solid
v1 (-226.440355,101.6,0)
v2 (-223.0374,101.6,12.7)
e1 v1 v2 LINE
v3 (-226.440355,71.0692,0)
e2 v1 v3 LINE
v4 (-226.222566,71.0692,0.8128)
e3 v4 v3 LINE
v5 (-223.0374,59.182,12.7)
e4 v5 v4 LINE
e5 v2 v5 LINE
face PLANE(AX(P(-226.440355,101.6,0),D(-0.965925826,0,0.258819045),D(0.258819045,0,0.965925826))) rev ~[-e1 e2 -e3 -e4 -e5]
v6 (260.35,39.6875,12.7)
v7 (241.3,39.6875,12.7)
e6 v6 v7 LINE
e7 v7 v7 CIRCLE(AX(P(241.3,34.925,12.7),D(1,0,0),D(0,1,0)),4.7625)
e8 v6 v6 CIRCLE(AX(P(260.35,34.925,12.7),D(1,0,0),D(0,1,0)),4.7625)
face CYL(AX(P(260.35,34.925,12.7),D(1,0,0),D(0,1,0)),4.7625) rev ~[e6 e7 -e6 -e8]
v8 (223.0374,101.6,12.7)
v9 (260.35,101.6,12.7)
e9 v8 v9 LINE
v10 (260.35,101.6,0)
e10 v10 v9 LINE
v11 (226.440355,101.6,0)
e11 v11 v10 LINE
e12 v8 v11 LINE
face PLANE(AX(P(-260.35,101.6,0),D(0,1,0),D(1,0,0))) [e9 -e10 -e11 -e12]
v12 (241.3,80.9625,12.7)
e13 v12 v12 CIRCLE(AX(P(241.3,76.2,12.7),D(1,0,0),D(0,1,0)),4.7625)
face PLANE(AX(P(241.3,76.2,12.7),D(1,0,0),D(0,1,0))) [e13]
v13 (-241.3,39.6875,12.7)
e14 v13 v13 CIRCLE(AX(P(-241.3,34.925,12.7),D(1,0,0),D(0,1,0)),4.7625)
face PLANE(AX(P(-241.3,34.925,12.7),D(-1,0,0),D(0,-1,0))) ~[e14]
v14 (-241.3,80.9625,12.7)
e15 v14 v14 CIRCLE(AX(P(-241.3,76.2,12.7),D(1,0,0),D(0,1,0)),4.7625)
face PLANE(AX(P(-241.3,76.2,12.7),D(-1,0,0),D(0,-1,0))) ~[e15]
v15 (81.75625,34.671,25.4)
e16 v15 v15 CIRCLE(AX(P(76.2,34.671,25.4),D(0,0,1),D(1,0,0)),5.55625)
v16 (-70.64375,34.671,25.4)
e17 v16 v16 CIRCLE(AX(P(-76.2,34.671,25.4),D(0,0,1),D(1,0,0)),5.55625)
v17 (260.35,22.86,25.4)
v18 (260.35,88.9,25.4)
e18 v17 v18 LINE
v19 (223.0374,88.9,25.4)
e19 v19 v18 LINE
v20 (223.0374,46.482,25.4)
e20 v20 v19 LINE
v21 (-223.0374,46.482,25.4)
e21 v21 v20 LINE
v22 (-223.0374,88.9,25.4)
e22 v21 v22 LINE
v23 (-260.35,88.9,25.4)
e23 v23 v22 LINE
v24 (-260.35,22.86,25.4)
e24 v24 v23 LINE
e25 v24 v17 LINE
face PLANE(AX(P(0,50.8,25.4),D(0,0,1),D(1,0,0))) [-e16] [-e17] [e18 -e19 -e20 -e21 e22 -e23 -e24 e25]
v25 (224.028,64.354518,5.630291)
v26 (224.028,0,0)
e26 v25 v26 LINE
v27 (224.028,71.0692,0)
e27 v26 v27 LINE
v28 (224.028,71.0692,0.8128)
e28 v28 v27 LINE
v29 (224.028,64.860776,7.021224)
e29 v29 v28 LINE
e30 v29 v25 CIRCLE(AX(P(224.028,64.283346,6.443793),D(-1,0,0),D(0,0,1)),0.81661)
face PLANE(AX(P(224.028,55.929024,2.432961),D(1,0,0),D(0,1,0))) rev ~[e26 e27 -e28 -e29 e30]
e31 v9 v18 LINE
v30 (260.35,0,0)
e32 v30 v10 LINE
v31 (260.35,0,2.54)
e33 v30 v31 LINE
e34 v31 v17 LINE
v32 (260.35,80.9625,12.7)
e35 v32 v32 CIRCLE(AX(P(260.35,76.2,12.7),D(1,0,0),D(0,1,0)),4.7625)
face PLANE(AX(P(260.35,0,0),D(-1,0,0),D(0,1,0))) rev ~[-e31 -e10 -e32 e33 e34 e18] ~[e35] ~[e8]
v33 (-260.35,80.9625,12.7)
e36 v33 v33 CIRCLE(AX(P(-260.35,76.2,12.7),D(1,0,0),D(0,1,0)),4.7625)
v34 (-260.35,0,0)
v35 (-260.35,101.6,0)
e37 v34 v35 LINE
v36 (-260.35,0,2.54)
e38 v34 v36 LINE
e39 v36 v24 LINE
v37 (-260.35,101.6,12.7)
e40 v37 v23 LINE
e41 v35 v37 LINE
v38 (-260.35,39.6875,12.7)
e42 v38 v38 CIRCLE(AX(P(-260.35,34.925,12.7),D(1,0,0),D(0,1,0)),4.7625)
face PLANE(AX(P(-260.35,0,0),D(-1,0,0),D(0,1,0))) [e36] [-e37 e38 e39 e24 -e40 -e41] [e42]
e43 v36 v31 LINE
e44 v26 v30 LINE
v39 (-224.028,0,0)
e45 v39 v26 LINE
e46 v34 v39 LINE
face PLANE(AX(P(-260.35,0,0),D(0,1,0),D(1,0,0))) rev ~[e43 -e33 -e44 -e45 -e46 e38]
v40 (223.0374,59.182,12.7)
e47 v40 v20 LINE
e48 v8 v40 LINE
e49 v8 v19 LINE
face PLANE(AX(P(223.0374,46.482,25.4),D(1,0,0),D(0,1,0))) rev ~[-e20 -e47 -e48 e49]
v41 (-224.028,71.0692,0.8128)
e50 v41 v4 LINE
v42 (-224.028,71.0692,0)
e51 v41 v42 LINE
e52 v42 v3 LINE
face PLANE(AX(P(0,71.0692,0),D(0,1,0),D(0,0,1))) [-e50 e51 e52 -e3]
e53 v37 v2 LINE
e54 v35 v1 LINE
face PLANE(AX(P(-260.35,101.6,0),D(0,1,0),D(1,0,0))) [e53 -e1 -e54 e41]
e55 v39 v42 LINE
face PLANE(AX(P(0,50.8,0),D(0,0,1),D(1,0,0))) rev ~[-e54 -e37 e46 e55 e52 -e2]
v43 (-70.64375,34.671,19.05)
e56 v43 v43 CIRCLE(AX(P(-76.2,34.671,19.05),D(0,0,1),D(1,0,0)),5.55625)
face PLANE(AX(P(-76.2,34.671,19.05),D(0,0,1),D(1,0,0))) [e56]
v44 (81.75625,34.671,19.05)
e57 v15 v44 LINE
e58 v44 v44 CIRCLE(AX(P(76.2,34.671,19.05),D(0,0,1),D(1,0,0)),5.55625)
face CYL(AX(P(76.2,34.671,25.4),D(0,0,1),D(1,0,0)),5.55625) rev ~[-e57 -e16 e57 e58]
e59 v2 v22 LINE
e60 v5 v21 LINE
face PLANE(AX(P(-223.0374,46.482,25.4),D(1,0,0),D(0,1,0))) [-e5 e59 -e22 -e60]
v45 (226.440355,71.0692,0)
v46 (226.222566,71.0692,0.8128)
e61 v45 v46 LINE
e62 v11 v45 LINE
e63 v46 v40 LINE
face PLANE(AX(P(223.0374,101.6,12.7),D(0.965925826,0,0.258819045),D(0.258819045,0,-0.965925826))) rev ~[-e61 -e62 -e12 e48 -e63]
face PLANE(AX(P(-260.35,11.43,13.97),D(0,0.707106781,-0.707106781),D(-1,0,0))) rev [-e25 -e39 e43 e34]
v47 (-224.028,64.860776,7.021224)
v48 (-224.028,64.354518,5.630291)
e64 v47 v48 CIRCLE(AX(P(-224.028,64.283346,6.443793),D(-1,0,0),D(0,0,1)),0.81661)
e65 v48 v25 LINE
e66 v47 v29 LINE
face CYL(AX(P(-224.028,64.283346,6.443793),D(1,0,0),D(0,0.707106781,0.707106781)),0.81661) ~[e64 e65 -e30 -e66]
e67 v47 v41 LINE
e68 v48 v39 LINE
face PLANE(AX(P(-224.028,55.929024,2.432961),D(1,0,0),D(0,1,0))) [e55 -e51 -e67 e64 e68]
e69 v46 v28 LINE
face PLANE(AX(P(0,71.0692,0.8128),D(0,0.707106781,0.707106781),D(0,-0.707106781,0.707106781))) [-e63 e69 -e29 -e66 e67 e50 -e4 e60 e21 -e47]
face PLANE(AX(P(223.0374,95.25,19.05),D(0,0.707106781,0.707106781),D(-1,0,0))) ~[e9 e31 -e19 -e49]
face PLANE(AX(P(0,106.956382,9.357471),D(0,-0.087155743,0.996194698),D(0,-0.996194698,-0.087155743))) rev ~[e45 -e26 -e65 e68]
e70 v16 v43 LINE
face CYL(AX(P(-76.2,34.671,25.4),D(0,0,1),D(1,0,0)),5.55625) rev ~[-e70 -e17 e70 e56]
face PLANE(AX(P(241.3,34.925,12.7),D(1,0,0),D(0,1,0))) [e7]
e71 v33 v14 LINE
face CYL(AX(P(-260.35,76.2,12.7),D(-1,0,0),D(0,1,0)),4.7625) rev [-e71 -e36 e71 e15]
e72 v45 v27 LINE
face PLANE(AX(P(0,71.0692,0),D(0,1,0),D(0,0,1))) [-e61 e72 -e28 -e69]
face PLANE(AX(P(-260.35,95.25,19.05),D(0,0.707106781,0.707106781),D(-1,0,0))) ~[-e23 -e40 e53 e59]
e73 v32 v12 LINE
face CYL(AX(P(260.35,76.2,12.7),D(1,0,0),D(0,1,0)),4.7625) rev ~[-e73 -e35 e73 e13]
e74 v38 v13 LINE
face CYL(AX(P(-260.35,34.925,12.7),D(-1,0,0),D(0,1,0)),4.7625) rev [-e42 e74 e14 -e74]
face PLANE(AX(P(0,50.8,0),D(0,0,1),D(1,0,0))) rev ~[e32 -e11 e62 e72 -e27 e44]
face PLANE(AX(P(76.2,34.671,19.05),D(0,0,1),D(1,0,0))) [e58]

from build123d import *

# Parameters (mm, degrees)
F0_W      = 520.7
F0_H      = 101.6
F1_DEPTH  = 25.4
F2_SIZE   = 22.86
F3_W      = 446.0748
F3_H      = 55.118
F4_DEPTH  = 25.401
F6_DEPTH  = 55.118
F7_SIZE   = 12.7
F9_DEPTH  = 228.6
F10_R     = 5.55625
F11_DEPTH = 6.35
F12_R     = 4.7625
F13_DEPTH = 19.05
F15_DEPTH = 224.028
F16_R     = 0.81661


# Not quite as in the source:
# - a pattern or mirror of a feature is missing from the dataset's text; its kind, count and spacing are read off the source's solid


with BuildPart() as f1:
    # F0 (on Top) → F1 (new body)
    with BuildSketch(Plane.XY):
        with Locations((0, 50.8)):
            Rectangle(F0_W, F0_H)
    extrude(amount=F1_DEPTH)

    # F2
    f2_edges = [f1.edges().sort_by_distance(p)[0] for p in [
        (0, 0, 25.4),
    ]]
    chamfer(f2_edges, length=F2_SIZE)

    # F3 (on face) → F4 (cut, through all)
    with BuildSketch(Plane.XY.offset(25.4)):
        with Locations((0, 74.041)):
            Rectangle(F3_W, F3_H)
    extrude(amount=-F4_DEPTH, mode=Mode.SUBTRACT)

    # F5 (on face) → F6 (cut, through all)
    with BuildSketch(Plane(origin=(0, 101.6, 0), x_dir=(-1, 0, 0), z_dir=(0, 1, 0))):
        Polygon((-223.0374, 0), (-223.0374, 12.7), (-226.4403547439, 0), align=None)
        Polygon((223.0374, 0), (226.4403547439, 0), (223.0374, 12.7), align=None)
    extrude(amount=-F6_DEPTH, mode=Mode.SUBTRACT)

    # F7
    f7_edges = [f1.edges().sort_by_distance(p)[0] for p in [
        (241.6937, 101.6, 25.4),
        (-241.6937, 101.6, 25.4),
    ]]
    chamfer(f7_edges, length=F7_SIZE)

    # F8 (on Right) → F9 (join, symmetric)
    with BuildSketch(Plane.YZ):
        Polygon((71.0692, 0.8128), (46.482, 25.4), (46.482, 0), (71.0692, 0), align=None)
    extrude(amount=F9_DEPTH, both=True)

    # F10 (on face) → F11 (cut)
    with BuildSketch(Plane.XY.offset(25.4)):
        with Locations((76.2, 34.671)):
            Circle(F10_R)
        with Locations((-76.2, 34.671)):
            Circle(F10_R)
    extrude(amount=-F11_DEPTH, mode=Mode.SUBTRACT)

    # F12 (on face) → F13 (cut)
    with BuildSketch(Plane.YZ.offset(260.35)):
        with Locations((34.925, 12.7)):
            Circle(F12_R)
        with Locations((76.2, 12.7)):
            Circle(F12_R)
    f13 = extrude(amount=-F13_DEPTH, mode=Mode.SUBTRACT)

    # F13_copies: F13 across plane
    add(f13.mirror(Plane(origin=(0, 0, 0), x_dir=(0, 0, -1), z_dir=(-1, 0, 0))), mode=Mode.SUBTRACT)

    # F14 (on Right) → F15 (cut, symmetric)
    with BuildSketch(Plane.YZ):
        Polygon((106.9563822457, 9.3574709382), (0, 0), (107.775054872, 0), align=None)
    extrude(amount=F15_DEPTH, both=True, mode=Mode.SUBTRACT)

    # F16
    f16_edges = [f1.edges().sort_by_distance(p)[0] for p in [
        (0, 66.09908, 5.78292),
    ]]
    fillet(f16_edges, radius=F16_R)


solid = f1.part
